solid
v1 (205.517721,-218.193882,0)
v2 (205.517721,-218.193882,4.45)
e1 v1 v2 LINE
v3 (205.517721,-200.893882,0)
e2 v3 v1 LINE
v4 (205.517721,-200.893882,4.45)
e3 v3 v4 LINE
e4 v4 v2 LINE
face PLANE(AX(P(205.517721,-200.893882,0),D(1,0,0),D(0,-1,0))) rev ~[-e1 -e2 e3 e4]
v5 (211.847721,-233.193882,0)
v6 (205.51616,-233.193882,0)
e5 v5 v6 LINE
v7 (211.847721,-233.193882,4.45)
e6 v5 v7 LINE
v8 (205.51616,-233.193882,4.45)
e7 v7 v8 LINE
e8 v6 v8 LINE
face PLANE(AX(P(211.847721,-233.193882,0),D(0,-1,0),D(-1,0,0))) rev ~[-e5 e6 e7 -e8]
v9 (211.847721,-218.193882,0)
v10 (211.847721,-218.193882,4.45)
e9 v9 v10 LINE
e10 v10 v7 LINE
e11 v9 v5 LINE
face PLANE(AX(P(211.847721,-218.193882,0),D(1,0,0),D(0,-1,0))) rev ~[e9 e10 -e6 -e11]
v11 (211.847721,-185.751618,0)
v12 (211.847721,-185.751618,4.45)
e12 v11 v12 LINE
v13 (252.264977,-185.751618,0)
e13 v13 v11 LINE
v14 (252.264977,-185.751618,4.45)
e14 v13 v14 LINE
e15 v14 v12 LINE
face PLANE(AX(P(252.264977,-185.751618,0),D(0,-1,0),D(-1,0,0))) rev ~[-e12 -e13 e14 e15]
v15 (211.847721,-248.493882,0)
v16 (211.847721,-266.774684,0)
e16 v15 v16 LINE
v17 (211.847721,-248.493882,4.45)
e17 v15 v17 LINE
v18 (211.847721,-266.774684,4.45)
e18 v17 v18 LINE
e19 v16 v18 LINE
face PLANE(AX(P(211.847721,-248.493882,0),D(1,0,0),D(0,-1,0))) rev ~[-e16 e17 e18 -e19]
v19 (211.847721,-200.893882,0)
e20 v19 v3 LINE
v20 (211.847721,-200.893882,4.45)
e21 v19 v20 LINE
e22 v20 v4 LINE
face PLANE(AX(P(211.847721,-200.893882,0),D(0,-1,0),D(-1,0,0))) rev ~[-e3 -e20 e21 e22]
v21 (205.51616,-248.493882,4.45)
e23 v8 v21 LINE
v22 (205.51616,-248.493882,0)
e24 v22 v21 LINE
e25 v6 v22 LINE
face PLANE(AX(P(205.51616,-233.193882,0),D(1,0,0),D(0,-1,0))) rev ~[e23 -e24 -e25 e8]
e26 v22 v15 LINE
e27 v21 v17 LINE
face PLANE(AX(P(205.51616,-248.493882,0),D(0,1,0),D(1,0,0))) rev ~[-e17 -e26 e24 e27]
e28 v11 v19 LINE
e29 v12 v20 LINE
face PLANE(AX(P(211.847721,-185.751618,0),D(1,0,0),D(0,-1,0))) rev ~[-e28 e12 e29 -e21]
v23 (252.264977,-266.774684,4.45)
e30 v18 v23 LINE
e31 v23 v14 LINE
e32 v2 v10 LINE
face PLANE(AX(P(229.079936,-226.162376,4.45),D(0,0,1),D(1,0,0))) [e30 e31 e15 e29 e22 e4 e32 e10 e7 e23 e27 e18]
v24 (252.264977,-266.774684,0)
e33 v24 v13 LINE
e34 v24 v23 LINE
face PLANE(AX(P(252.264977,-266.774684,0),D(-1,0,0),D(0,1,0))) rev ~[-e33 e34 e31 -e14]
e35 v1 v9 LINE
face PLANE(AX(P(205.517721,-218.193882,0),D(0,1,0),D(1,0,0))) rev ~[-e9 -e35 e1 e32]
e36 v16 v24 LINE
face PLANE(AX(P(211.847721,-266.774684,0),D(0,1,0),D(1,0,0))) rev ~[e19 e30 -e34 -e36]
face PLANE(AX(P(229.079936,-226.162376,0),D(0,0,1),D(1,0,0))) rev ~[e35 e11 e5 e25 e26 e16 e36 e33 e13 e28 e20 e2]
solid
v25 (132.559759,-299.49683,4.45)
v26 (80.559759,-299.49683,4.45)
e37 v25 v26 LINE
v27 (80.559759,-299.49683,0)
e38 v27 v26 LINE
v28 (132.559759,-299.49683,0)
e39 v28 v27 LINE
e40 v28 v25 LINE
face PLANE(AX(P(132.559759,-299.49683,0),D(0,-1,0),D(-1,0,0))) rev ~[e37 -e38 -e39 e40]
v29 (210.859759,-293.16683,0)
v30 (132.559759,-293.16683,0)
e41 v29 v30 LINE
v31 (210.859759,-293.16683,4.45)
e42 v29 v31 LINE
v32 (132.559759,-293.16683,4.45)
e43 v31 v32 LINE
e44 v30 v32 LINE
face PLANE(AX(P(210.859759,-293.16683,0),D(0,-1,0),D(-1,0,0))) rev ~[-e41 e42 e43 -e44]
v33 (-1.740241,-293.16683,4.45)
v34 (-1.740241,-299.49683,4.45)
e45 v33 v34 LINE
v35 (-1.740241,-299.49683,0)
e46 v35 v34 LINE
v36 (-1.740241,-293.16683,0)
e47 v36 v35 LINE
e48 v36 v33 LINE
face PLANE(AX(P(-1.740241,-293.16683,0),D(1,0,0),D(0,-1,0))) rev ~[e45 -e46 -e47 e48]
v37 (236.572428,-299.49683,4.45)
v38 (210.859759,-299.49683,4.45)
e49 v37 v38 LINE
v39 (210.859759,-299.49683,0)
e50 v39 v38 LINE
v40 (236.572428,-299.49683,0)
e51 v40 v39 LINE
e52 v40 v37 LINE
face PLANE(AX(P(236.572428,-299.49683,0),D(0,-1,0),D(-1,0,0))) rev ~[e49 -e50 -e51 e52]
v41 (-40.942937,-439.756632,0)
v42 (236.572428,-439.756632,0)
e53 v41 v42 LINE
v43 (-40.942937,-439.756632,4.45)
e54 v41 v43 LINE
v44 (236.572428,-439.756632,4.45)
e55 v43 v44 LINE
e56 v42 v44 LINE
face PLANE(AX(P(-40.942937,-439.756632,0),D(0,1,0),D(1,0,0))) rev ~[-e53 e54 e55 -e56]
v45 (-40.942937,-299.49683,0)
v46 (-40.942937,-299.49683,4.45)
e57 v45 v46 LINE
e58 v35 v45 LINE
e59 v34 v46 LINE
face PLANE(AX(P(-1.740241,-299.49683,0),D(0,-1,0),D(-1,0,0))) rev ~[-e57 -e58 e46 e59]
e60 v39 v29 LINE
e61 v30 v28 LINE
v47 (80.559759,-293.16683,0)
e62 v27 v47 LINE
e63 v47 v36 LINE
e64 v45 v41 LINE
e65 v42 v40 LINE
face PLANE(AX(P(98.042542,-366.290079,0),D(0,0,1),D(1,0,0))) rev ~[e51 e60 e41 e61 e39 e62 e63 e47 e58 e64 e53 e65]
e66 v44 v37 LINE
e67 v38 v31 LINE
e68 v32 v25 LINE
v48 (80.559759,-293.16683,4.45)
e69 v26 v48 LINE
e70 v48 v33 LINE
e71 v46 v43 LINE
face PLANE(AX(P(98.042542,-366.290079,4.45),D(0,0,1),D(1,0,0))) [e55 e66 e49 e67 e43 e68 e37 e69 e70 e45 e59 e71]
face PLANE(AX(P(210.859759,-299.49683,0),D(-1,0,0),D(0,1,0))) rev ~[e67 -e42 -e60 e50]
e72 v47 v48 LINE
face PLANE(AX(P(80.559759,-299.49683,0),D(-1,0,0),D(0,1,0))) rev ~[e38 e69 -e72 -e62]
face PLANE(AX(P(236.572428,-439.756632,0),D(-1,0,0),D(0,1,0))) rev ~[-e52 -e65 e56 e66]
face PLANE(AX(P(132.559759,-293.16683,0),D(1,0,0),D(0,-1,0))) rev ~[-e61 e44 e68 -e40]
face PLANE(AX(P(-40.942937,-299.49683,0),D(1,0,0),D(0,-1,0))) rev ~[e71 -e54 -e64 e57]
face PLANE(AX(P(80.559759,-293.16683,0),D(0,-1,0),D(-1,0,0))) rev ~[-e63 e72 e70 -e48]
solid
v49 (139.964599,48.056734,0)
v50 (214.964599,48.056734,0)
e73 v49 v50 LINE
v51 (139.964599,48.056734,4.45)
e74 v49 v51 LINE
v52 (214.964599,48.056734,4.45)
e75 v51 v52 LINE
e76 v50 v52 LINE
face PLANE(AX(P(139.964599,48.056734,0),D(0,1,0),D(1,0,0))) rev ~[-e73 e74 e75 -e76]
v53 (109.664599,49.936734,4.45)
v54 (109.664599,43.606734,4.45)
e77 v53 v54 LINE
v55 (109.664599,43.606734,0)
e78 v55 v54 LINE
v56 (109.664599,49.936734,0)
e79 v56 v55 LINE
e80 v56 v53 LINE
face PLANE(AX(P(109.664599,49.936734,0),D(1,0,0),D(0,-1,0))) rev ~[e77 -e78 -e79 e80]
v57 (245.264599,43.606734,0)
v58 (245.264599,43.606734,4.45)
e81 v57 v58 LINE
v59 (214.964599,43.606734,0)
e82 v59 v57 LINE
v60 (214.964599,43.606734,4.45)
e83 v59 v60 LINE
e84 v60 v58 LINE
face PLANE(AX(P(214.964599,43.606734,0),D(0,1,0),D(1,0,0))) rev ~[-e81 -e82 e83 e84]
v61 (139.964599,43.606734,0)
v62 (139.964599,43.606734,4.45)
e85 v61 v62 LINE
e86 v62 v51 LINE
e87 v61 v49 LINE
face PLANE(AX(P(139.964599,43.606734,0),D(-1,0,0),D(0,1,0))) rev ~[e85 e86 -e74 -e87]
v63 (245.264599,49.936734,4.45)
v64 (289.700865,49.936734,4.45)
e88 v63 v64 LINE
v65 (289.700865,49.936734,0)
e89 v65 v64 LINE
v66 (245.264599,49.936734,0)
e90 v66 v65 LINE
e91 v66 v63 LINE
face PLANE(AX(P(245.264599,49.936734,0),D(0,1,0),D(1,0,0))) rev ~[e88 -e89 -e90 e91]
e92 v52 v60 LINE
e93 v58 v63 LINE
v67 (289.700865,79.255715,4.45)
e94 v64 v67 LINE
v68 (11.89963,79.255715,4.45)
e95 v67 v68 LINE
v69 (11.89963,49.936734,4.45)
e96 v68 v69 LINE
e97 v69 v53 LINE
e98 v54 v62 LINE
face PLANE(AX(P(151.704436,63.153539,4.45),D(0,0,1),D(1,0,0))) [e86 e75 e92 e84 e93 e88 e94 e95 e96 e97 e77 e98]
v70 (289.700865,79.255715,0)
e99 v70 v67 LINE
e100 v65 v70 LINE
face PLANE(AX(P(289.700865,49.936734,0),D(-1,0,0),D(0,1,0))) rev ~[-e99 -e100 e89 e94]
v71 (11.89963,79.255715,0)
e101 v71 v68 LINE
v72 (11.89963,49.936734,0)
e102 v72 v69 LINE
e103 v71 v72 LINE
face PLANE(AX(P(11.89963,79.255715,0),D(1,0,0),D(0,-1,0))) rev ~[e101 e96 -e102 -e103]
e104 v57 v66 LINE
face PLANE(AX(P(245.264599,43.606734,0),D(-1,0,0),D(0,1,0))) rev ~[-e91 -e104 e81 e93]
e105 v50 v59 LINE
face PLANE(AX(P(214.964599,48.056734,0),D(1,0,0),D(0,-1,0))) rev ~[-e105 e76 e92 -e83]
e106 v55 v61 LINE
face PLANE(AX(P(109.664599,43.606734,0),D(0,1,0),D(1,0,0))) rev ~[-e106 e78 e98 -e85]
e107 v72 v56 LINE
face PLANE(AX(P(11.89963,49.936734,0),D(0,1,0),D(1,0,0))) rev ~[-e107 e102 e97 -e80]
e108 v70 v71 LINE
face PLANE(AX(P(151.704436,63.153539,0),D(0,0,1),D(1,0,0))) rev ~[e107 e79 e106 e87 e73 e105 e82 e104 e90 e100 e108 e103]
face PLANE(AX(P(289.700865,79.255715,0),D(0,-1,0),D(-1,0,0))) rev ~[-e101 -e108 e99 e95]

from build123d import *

# Parameters (mm, degrees)
F1_DEPTH = 4.45


# Not quite as in the source:
# - a feature names something its author has since deleted; it is built from what else it names


with BuildPart() as f1:
    # F0 (on Top) → F1 (new body)
    with BuildSketch(Plane.XY):
        Polygon((-1.7402413478, -299.4968297958), (-40.9429369935, -299.4968297958), (-40.9429369935, -439.7566318512), (236.5724275148, -439.7566318512), (236.5724275148, -299.4968297958), (215.0616164281, -299.4968297958), (210.8597586522, -299.4968297958), (210.8597586522, -293.1668297958), (132.5597586522, -293.1668297958), (132.5597586522, -299.4968297958), (80.5597586522, -299.4968297958), (80.5597586522, -293.1668297958), (-1.7402413478, -293.1668297958), align=None)
    extrude(amount=F1_DEPTH)


with BuildPart() as f1b:
    # F0 (on Top) → F1, piece 2 (new body)
    with BuildSketch(Plane.XY):
        Polygon((252.2649765015, -185.7516178083), (211.8477205402, -185.7516178083), (211.8477205402, -200.6451304226), (211.8477205402, -200.8938822837), (205.5177205402, -200.8938822837), (205.5177205402, -218.1938822837), (211.8477205402, -218.1938822837), (211.8477205402, -226.2631509995), (211.8477205402, -230.1938822837), (211.8477205402, -232.7680322837), (211.8477205402, -233.1938822837), (205.5161595345, -233.1938822837), (205.5161595345, -248.4938822837), (211.8477205402, -248.4938822837), (211.8477205402, -266.7746841908), (252.2649765015, -266.7746841908), align=None)
    extrude(amount=F1_DEPTH)


with BuildPart() as f1c:
    # F0 (on Top) → F1, piece 3 (new body)
    with BuildSketch(Plane.XY):
        Polygon((109.6645991251, 49.936733744), (109.6645991251, 43.606733744), (139.9645991251, 43.606733744), (139.9645991251, 48.056733744), (214.9645991251, 48.056733744), (214.9645991251, 43.606733744), (245.2645991251, 43.606733744), (245.2645991251, 49.936733744), (289.7008654758, 49.936733744), (289.7008654758, 79.2557150126), (11.8996296078, 79.2557150126), (11.8996296078, 49.936733744), (86.1305896078, 49.936733744), align=None)
    extrude(amount=F1_DEPTH)


solid = Compound([f1.part, f1b.part, f1c.part])
